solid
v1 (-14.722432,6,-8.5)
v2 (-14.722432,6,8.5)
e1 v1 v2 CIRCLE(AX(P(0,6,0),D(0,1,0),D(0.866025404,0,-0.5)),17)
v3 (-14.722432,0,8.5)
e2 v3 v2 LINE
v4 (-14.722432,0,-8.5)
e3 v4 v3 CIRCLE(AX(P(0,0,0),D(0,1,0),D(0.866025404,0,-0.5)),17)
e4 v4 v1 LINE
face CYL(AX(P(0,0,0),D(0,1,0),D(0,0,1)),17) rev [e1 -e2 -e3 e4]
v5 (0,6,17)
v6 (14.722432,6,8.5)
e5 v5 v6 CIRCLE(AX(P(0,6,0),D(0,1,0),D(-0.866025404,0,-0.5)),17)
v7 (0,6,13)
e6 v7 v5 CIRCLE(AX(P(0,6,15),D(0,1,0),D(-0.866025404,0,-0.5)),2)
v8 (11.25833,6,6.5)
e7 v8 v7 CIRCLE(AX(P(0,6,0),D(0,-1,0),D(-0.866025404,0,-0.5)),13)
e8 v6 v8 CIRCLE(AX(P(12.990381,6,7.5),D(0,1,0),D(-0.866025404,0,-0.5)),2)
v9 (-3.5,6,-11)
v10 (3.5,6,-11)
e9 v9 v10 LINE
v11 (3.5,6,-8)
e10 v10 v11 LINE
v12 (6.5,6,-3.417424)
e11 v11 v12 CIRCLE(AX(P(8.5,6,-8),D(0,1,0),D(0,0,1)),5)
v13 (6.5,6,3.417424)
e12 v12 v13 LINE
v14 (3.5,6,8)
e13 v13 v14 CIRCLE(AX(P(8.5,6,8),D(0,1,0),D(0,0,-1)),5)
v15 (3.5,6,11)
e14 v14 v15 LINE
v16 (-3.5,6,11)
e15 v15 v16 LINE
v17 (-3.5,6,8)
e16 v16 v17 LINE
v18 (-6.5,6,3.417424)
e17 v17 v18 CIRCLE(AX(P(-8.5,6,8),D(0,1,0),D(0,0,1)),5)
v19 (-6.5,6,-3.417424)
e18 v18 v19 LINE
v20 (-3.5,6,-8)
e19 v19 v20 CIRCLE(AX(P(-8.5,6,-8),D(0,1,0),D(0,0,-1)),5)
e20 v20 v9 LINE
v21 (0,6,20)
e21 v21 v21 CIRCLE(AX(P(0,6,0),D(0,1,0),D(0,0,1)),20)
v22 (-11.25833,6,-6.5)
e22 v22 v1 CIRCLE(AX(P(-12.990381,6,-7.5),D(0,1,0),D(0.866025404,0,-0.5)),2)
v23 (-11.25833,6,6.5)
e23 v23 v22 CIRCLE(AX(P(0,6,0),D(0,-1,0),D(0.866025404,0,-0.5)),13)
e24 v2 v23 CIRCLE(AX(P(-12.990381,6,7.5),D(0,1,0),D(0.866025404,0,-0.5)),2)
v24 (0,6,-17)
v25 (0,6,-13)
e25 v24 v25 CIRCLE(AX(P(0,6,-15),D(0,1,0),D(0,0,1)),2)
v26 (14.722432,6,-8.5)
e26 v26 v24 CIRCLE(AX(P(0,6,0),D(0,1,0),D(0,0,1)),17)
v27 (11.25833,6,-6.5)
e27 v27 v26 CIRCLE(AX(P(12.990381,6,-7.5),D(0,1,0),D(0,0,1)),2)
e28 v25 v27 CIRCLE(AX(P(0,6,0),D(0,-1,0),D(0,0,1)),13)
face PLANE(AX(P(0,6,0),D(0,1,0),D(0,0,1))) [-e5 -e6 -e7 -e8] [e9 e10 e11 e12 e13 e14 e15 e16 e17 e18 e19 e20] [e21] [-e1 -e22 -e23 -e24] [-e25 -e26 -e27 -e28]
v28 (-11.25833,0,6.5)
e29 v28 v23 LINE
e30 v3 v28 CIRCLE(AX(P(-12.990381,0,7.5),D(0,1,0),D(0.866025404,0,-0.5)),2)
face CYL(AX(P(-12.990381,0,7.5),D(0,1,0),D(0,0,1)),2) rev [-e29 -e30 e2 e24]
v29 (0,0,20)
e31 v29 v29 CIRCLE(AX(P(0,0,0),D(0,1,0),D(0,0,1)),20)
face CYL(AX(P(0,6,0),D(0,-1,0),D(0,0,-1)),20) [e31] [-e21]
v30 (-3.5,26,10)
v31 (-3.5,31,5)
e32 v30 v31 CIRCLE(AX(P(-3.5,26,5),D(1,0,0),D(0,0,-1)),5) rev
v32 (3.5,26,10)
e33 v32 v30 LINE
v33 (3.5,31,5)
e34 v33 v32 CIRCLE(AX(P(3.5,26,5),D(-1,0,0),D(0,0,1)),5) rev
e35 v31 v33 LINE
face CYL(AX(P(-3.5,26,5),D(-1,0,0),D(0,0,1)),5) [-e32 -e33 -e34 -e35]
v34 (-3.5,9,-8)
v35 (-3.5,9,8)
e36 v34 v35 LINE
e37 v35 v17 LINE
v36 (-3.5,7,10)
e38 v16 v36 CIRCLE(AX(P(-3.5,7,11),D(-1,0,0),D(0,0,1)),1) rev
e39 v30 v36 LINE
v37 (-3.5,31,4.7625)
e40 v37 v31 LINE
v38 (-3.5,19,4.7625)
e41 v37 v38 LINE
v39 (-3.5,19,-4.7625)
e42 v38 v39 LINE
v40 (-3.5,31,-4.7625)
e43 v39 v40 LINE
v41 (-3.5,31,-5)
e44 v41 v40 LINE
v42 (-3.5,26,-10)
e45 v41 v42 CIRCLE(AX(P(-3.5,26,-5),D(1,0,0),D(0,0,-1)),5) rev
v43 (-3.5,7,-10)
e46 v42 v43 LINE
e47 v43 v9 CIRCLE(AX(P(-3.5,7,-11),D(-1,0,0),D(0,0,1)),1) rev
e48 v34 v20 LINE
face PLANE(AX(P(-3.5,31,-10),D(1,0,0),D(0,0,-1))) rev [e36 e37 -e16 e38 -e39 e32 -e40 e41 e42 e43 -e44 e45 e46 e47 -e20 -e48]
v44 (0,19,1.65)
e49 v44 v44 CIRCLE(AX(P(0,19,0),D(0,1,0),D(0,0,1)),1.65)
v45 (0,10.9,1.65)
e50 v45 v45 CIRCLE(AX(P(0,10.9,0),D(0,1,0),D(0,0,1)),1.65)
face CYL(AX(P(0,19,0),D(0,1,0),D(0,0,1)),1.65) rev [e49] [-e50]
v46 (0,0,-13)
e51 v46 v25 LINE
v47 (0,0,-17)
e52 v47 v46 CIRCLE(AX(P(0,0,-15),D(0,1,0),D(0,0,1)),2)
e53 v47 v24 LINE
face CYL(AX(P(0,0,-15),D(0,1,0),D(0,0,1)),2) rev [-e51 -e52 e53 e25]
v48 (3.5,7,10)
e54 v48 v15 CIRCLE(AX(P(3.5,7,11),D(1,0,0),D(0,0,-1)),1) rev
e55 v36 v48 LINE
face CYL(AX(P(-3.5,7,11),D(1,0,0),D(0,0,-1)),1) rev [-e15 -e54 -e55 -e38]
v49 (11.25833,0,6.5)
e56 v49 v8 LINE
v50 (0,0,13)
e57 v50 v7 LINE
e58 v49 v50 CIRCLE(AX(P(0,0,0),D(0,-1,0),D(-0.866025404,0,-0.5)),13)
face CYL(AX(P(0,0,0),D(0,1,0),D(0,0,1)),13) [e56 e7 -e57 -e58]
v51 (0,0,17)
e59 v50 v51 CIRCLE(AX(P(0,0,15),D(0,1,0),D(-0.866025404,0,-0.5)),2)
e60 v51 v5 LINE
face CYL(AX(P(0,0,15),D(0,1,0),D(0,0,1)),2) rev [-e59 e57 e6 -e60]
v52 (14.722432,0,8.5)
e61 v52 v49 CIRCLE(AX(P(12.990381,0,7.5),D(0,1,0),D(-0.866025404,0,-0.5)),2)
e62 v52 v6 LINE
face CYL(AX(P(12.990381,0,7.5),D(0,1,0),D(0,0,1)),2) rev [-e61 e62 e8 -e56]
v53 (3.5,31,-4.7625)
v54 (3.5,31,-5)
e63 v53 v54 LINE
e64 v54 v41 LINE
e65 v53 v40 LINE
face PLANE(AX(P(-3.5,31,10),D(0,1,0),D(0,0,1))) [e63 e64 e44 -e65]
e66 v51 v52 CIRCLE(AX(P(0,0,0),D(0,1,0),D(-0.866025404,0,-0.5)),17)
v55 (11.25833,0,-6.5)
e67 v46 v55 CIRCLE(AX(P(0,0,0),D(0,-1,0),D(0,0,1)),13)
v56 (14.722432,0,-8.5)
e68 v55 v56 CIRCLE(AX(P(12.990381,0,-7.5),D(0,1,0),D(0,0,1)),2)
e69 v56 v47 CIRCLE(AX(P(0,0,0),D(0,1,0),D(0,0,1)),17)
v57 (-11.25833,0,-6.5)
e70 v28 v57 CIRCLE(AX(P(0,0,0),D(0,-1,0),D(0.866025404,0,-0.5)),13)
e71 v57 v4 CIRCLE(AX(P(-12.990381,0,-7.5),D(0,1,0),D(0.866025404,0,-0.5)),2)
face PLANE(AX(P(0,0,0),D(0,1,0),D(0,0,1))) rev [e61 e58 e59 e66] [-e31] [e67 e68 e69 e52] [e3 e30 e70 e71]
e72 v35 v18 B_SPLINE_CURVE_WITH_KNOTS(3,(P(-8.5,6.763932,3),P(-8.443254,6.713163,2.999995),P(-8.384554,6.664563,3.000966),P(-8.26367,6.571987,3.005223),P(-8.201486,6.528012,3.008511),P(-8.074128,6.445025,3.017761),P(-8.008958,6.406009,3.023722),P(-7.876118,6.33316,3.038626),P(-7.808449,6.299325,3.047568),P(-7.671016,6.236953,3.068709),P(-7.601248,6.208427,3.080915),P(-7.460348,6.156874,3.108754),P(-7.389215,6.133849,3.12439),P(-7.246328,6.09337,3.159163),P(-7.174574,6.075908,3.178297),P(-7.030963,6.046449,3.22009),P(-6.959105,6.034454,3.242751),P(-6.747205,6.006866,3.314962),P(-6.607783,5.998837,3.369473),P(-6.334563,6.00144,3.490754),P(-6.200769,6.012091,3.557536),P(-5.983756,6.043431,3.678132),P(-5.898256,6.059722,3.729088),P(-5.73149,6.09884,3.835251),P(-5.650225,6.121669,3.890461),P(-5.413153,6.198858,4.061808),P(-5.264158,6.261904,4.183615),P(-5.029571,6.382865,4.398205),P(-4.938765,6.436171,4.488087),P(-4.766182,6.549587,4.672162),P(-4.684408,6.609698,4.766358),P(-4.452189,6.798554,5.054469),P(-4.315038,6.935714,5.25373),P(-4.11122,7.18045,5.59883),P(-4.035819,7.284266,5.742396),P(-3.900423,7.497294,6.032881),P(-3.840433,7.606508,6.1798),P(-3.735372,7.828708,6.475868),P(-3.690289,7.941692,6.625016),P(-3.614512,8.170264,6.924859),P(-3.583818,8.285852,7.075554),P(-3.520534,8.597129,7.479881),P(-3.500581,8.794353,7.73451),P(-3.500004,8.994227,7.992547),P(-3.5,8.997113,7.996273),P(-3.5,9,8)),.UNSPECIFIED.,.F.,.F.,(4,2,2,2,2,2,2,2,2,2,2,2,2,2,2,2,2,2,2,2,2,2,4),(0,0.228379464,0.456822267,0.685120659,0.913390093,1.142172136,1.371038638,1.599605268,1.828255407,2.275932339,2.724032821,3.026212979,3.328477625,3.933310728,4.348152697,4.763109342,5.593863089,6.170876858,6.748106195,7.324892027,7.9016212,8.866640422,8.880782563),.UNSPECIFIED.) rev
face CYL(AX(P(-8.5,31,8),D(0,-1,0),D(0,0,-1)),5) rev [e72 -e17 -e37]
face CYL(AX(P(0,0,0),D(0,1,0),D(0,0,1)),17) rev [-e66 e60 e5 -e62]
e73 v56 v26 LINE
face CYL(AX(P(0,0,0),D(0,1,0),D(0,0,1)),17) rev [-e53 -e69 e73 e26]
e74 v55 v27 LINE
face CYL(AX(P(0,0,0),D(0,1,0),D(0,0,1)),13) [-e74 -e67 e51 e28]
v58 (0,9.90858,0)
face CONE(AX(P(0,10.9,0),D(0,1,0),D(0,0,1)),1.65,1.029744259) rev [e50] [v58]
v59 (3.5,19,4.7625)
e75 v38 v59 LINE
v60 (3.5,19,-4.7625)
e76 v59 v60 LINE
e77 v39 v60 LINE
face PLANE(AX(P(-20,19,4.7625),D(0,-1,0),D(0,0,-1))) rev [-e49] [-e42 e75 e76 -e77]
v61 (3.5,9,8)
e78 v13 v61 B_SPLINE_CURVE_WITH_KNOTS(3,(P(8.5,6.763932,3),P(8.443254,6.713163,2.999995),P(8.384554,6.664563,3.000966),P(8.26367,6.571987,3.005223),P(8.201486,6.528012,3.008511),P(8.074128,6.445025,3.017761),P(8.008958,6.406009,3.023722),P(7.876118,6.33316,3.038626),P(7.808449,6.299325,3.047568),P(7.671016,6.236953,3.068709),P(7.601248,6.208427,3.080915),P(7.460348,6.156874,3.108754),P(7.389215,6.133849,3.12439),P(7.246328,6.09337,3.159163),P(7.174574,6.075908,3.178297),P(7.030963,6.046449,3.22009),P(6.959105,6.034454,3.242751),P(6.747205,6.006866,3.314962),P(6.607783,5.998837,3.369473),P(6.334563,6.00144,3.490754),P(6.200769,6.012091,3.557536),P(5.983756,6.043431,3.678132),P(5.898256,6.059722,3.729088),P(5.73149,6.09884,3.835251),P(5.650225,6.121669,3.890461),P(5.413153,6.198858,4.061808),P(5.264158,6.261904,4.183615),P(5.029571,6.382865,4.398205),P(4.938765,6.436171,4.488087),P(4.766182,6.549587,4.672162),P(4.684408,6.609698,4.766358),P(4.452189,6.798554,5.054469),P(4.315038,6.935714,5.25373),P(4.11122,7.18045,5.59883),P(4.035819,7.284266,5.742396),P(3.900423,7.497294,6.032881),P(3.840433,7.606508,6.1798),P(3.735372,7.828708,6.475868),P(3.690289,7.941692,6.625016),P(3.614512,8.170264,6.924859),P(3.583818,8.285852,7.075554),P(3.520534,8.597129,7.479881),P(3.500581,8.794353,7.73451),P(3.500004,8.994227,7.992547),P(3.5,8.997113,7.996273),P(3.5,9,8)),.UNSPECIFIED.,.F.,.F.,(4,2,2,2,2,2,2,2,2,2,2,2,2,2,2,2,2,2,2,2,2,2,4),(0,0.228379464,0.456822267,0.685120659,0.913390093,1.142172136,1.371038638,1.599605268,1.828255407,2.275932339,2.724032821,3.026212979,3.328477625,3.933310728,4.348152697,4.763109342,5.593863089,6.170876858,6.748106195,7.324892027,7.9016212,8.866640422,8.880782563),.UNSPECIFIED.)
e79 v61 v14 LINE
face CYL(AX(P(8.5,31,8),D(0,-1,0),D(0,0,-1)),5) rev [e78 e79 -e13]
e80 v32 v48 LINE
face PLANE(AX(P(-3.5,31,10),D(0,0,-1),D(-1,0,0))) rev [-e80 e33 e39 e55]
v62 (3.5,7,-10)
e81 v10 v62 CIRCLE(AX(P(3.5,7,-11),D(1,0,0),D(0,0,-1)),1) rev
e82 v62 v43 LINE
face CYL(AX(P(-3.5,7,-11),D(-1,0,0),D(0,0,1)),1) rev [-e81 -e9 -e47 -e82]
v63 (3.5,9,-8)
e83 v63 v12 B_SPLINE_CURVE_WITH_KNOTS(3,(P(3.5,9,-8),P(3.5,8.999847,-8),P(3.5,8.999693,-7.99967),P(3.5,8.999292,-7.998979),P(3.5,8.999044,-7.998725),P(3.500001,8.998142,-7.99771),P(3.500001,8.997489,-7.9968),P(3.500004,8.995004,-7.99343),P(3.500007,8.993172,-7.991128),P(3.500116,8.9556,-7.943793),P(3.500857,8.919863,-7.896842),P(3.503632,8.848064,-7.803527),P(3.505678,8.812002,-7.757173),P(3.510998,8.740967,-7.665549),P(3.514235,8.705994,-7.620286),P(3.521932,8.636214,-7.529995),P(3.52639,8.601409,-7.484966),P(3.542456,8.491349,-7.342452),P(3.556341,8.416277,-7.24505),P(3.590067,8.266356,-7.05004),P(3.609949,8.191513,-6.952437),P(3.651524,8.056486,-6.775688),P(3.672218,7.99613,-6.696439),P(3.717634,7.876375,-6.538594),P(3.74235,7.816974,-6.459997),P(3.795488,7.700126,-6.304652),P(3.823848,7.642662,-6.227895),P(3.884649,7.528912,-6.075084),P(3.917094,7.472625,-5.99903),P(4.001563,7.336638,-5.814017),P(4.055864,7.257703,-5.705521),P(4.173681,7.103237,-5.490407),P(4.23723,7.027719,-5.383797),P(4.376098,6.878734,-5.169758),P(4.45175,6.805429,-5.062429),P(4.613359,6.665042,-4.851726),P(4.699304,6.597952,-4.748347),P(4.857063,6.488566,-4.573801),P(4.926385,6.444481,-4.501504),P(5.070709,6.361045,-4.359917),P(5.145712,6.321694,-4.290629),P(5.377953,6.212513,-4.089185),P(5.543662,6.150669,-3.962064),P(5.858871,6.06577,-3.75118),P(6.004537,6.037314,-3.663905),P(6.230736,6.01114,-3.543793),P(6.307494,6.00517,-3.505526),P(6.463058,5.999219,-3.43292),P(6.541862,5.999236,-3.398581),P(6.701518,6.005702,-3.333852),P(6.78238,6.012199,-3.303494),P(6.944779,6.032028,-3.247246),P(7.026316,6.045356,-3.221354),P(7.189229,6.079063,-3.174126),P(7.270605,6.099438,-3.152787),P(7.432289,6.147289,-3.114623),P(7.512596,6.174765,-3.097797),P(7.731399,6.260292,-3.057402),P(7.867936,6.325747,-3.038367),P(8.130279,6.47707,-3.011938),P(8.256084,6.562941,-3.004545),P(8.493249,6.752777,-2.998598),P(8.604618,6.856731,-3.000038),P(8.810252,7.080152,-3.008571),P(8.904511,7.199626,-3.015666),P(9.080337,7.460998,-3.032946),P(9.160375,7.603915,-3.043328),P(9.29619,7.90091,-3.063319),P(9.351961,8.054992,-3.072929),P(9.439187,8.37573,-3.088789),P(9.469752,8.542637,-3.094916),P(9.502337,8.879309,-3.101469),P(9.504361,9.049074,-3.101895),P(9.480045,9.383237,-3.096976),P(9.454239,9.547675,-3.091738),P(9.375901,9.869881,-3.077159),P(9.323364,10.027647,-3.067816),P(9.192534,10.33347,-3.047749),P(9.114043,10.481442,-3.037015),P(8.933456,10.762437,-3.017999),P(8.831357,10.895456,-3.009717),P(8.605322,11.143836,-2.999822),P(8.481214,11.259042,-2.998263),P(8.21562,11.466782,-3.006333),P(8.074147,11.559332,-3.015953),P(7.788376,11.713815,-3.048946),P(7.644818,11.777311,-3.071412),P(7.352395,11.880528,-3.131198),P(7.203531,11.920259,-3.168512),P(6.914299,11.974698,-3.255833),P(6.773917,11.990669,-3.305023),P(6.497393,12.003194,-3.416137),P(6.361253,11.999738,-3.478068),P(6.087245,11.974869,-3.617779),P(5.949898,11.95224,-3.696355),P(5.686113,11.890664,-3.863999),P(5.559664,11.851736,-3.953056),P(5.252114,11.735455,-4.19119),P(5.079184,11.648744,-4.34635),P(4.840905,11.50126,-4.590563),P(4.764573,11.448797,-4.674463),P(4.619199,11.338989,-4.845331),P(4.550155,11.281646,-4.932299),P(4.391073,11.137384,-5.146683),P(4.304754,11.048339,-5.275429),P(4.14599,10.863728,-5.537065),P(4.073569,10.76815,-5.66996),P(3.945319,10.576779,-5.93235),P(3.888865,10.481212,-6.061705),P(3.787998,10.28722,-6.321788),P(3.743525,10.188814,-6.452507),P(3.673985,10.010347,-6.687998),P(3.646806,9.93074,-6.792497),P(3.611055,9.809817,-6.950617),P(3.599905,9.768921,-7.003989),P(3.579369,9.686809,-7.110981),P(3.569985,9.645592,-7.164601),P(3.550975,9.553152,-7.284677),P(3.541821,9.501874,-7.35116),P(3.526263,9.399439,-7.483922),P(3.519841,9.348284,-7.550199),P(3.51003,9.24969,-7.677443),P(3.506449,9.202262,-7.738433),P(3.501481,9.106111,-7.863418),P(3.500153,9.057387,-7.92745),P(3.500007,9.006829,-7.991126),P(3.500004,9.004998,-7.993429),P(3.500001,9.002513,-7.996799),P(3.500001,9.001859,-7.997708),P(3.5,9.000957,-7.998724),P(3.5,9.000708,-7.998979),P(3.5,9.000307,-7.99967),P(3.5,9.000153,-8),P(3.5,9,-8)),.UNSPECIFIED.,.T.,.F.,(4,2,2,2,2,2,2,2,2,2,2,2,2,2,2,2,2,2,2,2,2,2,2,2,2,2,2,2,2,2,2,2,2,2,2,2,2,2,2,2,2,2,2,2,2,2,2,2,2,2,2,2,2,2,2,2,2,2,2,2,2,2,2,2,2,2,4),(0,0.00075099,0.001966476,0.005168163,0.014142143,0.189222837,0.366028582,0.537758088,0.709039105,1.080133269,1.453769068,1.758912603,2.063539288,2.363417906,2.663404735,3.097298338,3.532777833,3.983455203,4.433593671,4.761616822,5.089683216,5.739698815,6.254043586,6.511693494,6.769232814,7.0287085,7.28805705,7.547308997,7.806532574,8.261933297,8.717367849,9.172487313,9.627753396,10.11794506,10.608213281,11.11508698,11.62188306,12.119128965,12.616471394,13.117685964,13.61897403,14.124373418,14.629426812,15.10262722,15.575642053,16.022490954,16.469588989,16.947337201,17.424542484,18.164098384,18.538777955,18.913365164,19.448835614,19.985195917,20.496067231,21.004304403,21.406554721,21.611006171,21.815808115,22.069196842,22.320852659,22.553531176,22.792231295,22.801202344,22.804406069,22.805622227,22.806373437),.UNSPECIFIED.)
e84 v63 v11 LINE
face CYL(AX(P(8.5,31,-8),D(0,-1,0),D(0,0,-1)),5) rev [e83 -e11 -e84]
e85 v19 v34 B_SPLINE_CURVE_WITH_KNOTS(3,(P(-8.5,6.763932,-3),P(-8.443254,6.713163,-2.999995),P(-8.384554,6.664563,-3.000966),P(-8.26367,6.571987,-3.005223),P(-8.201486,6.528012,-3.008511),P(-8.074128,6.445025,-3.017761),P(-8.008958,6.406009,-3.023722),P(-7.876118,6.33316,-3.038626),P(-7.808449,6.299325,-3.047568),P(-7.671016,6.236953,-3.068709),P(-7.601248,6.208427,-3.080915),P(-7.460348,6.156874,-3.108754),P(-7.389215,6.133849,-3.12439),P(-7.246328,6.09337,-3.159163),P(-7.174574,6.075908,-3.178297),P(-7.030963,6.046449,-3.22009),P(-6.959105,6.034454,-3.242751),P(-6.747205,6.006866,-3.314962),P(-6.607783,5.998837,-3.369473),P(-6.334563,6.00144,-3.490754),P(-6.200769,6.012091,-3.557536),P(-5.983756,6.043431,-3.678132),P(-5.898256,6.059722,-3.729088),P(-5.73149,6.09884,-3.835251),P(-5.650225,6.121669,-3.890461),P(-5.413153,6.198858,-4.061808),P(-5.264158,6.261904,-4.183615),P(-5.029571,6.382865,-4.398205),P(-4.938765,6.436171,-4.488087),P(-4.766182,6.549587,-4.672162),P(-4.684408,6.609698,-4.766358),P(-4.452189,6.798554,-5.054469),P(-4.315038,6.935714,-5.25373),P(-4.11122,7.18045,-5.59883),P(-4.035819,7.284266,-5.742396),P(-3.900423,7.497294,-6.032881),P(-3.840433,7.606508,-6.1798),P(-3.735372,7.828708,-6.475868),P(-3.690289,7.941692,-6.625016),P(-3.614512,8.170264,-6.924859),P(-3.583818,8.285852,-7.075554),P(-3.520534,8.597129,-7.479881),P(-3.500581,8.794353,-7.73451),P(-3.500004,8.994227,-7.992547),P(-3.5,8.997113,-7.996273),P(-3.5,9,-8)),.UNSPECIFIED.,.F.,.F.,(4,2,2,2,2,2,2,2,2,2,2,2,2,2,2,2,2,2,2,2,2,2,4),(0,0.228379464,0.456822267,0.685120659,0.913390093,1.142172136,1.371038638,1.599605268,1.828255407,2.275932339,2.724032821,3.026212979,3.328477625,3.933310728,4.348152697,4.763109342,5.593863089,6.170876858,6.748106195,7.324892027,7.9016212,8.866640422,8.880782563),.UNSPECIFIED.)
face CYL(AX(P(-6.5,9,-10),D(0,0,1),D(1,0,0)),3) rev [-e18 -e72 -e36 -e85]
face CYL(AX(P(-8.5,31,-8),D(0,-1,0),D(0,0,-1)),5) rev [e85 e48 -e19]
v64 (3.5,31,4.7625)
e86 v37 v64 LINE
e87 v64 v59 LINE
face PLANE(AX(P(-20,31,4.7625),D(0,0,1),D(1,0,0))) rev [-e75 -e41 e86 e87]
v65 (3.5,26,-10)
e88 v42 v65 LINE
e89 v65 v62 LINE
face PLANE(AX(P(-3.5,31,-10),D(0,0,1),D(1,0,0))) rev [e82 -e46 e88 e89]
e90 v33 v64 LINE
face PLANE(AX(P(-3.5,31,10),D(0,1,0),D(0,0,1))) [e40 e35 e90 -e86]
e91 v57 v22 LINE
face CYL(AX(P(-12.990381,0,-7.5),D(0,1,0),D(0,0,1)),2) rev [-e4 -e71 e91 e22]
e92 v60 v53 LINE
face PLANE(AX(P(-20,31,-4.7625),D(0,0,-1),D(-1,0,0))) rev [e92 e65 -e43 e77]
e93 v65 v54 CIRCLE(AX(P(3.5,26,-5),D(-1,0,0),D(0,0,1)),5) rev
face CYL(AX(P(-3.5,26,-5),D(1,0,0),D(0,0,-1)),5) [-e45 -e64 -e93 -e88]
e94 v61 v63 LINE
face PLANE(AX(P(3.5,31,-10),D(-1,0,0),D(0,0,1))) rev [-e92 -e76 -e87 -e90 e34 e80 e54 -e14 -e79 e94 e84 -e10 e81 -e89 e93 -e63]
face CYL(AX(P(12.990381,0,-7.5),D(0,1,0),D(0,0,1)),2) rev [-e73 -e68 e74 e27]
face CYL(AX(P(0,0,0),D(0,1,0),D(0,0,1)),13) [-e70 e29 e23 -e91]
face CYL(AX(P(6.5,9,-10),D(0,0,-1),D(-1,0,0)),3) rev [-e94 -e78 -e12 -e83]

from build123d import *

# Parameters (mm, degrees)
SKETCH1_R                 = 20
BOSS_EXTRUDE1_DEPTH       = 6
CUT_EXTRUDE1_DEPTH        = 29.91366459
CIRPATTERN1_COUNT         = 3
SKETCH3_W                 = 7
SKETCH3_H                 = 20
BOSS_EXTRUDE2_DEPTH       = 25
SKETCH4_W                 = 9.525
SKETCH4_H                 = 12
CUT_EXTRUDE2_DEPTH        = 44.7407133
FILLET1_R                 = 1
FILLET2_R                 = 3
CUT_EXTRUDE3_DEPTH        = 38.749172176
M4X0_7_TAPPED_HOLE1_D     = 3.3
M4X0_7_TAPPED_HOLE1_DEPTH = 8.1
M4X0_7_TAPPED_HOLE1_TIP   = 0.991420021
FILLET3_R                 = 5


with BuildPart() as part:
    # Sketch1 → Boss-Extrude1 (new body)
    with BuildSketch(Plane(origin=(0, 0, 0), x_dir=(1, 0, 0), z_dir=(0, 1, 0))):
        Circle(SKETCH1_R)
    extrude(amount=BOSS_EXTRUDE1_DEPTH)

    # Sketch2 → Cut-Extrude1 (cut, through all)
    with BuildSketch(Plane(origin=(0, 6, 0), x_dir=(1, 0, 0), z_dir=(0, 1, 0))):
        with BuildLine():
            ThreePointArc((0, 17), (-2, 15), (0, 13))
            ThreePointArc((0, 13), (6.5, 11.258330249), (11.258330249, 6.5))
            ThreePointArc((11.258330249, 6.5), (13.990381057, 5.767949192), (14.722431864, 8.5))
            ThreePointArc((14.722431864, 8.5), (8.5, 14.722431864), (0, 17))
        make_face()
    cut_extrude1 = extrude(amount=-CUT_EXTRUDE1_DEPTH, mode=Mode.SUBTRACT)

    # CirPattern1: Cut-Extrude1 ×3 about axis
    cirpattern1_axis = Axis((0, 6, 0), (0, -1, 0))
    for i in range(1, CIRPATTERN1_COUNT):
        add(cut_extrude1.rotate(cirpattern1_axis, i * 360 / CIRPATTERN1_COUNT), mode=Mode.SUBTRACT)

    # Sketch3 → Boss-Extrude2 (add)
    with BuildSketch(Plane(origin=(0, 6, 0), x_dir=(1, 0, 0), z_dir=(0, 1, 0))):
        Rectangle(SKETCH3_W, SKETCH3_H)
    extrude(amount=BOSS_EXTRUDE2_DEPTH)

    # Sketch4 → Cut-Extrude2 (cut, through all)
    with BuildSketch(Plane(origin=(3.5, 0, 0), x_dir=(0, 0, -1), z_dir=(1, 0, 0))):
        with Locations((0, 25)):
            Rectangle(SKETCH4_W, SKETCH4_H)
    extrude(amount=-CUT_EXTRUDE2_DEPTH, mode=Mode.SUBTRACT)

    # Fillet1
    fillet1_edges = [part.edges().sort_by_distance(p)[0] for p in [
        (0, 6, -10),
        (0, 6, 10),
    ]]
    fillet(fillet1_edges, radius=FILLET1_R)

    # Fillet2
    fillet2_edges = [part.edges().sort_by_distance(p)[0] for p in [
        (3.5, 6, 0),
    ]]
    fillet(fillet2_edges, radius=FILLET2_R)
    fillet2_2_edges = [part.edges().sort_by_distance(p)[0] for p in [
        (-3.5, 6, 0),
    ]]
    fillet(fillet2_2_edges, radius=FILLET2_R)

    # Sketch5 → Cut-Extrude3 (cut, through all)
    with BuildSketch(Plane(origin=(0, 6, 0), x_dir=(1, 0, 0), z_dir=(0, 1, 0))):
        with BuildLine():
            Line((-9.5, 13), (-3.5, 13))
            Line((-3.5, 13), (-3.5, 8))
            ThreePointArc((-3.5, 8), (-4.964466094, 4.464466094), (-8.5, 3))
            Line((-8.5, 3), (-9.5, 3))
            Line((-9.5, 3), (-9.5, 13))
        make_face()
        with BuildLine():
            Line((9.5, 3), (8.5, 3))
            ThreePointArc((8.5, 3), (4.964466094, 4.464466094), (3.5, 8))
            Line((3.5, 8), (3.5, 13))
            Line((3.5, 13), (9.5, 13))
            Line((9.5, 13), (9.5, 3))
        make_face()
        with BuildLine():
            Line((9.5, -13), (9.5, -3))
            Line((9.5, -3), (8.5, -3))
            ThreePointArc((8.5, -3), (4.964466094, -4.464466094), (3.5, -8))
            Line((3.5, -8), (3.5, -13))
            Line((3.5, -13), (9.5, -13))
        make_face()
        with BuildLine():
            Line((-3.5, -13), (-3.5, -8))
            ThreePointArc((-3.5, -8), (-4.964466094, -4.464466094), (-8.5, -3))
            Line((-8.5, -3), (-9.5, -3))
            Line((-9.5, -3), (-9.5, -13))
            Line((-9.5, -13), (-3.5, -13))
        make_face()
    extrude(amount=CUT_EXTRUDE3_DEPTH, mode=Mode.SUBTRACT)

    # M4x0.7 Tapped Hole1
    with Locations(Plane(origin=(0, 19, 0), x_dir=(-1, 0, 0), z_dir=(0, 1, 0))):
        with Locations((0, 0)):
            Hole(M4X0_7_TAPPED_HOLE1_D / 2, depth=M4X0_7_TAPPED_HOLE1_DEPTH)
            with Locations((0, 0, -(M4X0_7_TAPPED_HOLE1_DEPTH + M4X0_7_TAPPED_HOLE1_TIP / 2))):  # 118° drill point
                Cone(0, M4X0_7_TAPPED_HOLE1_D / 2, M4X0_7_TAPPED_HOLE1_TIP, mode=Mode.SUBTRACT)

    # Fillet3
    fillet3_edges = [part.edges().sort_by_distance(p)[0] for p in [
        (0, 31, -10),
        (0, 31, 10),
    ]]
    fillet(fillet3_edges, radius=FILLET3_R)


solid = part.part
